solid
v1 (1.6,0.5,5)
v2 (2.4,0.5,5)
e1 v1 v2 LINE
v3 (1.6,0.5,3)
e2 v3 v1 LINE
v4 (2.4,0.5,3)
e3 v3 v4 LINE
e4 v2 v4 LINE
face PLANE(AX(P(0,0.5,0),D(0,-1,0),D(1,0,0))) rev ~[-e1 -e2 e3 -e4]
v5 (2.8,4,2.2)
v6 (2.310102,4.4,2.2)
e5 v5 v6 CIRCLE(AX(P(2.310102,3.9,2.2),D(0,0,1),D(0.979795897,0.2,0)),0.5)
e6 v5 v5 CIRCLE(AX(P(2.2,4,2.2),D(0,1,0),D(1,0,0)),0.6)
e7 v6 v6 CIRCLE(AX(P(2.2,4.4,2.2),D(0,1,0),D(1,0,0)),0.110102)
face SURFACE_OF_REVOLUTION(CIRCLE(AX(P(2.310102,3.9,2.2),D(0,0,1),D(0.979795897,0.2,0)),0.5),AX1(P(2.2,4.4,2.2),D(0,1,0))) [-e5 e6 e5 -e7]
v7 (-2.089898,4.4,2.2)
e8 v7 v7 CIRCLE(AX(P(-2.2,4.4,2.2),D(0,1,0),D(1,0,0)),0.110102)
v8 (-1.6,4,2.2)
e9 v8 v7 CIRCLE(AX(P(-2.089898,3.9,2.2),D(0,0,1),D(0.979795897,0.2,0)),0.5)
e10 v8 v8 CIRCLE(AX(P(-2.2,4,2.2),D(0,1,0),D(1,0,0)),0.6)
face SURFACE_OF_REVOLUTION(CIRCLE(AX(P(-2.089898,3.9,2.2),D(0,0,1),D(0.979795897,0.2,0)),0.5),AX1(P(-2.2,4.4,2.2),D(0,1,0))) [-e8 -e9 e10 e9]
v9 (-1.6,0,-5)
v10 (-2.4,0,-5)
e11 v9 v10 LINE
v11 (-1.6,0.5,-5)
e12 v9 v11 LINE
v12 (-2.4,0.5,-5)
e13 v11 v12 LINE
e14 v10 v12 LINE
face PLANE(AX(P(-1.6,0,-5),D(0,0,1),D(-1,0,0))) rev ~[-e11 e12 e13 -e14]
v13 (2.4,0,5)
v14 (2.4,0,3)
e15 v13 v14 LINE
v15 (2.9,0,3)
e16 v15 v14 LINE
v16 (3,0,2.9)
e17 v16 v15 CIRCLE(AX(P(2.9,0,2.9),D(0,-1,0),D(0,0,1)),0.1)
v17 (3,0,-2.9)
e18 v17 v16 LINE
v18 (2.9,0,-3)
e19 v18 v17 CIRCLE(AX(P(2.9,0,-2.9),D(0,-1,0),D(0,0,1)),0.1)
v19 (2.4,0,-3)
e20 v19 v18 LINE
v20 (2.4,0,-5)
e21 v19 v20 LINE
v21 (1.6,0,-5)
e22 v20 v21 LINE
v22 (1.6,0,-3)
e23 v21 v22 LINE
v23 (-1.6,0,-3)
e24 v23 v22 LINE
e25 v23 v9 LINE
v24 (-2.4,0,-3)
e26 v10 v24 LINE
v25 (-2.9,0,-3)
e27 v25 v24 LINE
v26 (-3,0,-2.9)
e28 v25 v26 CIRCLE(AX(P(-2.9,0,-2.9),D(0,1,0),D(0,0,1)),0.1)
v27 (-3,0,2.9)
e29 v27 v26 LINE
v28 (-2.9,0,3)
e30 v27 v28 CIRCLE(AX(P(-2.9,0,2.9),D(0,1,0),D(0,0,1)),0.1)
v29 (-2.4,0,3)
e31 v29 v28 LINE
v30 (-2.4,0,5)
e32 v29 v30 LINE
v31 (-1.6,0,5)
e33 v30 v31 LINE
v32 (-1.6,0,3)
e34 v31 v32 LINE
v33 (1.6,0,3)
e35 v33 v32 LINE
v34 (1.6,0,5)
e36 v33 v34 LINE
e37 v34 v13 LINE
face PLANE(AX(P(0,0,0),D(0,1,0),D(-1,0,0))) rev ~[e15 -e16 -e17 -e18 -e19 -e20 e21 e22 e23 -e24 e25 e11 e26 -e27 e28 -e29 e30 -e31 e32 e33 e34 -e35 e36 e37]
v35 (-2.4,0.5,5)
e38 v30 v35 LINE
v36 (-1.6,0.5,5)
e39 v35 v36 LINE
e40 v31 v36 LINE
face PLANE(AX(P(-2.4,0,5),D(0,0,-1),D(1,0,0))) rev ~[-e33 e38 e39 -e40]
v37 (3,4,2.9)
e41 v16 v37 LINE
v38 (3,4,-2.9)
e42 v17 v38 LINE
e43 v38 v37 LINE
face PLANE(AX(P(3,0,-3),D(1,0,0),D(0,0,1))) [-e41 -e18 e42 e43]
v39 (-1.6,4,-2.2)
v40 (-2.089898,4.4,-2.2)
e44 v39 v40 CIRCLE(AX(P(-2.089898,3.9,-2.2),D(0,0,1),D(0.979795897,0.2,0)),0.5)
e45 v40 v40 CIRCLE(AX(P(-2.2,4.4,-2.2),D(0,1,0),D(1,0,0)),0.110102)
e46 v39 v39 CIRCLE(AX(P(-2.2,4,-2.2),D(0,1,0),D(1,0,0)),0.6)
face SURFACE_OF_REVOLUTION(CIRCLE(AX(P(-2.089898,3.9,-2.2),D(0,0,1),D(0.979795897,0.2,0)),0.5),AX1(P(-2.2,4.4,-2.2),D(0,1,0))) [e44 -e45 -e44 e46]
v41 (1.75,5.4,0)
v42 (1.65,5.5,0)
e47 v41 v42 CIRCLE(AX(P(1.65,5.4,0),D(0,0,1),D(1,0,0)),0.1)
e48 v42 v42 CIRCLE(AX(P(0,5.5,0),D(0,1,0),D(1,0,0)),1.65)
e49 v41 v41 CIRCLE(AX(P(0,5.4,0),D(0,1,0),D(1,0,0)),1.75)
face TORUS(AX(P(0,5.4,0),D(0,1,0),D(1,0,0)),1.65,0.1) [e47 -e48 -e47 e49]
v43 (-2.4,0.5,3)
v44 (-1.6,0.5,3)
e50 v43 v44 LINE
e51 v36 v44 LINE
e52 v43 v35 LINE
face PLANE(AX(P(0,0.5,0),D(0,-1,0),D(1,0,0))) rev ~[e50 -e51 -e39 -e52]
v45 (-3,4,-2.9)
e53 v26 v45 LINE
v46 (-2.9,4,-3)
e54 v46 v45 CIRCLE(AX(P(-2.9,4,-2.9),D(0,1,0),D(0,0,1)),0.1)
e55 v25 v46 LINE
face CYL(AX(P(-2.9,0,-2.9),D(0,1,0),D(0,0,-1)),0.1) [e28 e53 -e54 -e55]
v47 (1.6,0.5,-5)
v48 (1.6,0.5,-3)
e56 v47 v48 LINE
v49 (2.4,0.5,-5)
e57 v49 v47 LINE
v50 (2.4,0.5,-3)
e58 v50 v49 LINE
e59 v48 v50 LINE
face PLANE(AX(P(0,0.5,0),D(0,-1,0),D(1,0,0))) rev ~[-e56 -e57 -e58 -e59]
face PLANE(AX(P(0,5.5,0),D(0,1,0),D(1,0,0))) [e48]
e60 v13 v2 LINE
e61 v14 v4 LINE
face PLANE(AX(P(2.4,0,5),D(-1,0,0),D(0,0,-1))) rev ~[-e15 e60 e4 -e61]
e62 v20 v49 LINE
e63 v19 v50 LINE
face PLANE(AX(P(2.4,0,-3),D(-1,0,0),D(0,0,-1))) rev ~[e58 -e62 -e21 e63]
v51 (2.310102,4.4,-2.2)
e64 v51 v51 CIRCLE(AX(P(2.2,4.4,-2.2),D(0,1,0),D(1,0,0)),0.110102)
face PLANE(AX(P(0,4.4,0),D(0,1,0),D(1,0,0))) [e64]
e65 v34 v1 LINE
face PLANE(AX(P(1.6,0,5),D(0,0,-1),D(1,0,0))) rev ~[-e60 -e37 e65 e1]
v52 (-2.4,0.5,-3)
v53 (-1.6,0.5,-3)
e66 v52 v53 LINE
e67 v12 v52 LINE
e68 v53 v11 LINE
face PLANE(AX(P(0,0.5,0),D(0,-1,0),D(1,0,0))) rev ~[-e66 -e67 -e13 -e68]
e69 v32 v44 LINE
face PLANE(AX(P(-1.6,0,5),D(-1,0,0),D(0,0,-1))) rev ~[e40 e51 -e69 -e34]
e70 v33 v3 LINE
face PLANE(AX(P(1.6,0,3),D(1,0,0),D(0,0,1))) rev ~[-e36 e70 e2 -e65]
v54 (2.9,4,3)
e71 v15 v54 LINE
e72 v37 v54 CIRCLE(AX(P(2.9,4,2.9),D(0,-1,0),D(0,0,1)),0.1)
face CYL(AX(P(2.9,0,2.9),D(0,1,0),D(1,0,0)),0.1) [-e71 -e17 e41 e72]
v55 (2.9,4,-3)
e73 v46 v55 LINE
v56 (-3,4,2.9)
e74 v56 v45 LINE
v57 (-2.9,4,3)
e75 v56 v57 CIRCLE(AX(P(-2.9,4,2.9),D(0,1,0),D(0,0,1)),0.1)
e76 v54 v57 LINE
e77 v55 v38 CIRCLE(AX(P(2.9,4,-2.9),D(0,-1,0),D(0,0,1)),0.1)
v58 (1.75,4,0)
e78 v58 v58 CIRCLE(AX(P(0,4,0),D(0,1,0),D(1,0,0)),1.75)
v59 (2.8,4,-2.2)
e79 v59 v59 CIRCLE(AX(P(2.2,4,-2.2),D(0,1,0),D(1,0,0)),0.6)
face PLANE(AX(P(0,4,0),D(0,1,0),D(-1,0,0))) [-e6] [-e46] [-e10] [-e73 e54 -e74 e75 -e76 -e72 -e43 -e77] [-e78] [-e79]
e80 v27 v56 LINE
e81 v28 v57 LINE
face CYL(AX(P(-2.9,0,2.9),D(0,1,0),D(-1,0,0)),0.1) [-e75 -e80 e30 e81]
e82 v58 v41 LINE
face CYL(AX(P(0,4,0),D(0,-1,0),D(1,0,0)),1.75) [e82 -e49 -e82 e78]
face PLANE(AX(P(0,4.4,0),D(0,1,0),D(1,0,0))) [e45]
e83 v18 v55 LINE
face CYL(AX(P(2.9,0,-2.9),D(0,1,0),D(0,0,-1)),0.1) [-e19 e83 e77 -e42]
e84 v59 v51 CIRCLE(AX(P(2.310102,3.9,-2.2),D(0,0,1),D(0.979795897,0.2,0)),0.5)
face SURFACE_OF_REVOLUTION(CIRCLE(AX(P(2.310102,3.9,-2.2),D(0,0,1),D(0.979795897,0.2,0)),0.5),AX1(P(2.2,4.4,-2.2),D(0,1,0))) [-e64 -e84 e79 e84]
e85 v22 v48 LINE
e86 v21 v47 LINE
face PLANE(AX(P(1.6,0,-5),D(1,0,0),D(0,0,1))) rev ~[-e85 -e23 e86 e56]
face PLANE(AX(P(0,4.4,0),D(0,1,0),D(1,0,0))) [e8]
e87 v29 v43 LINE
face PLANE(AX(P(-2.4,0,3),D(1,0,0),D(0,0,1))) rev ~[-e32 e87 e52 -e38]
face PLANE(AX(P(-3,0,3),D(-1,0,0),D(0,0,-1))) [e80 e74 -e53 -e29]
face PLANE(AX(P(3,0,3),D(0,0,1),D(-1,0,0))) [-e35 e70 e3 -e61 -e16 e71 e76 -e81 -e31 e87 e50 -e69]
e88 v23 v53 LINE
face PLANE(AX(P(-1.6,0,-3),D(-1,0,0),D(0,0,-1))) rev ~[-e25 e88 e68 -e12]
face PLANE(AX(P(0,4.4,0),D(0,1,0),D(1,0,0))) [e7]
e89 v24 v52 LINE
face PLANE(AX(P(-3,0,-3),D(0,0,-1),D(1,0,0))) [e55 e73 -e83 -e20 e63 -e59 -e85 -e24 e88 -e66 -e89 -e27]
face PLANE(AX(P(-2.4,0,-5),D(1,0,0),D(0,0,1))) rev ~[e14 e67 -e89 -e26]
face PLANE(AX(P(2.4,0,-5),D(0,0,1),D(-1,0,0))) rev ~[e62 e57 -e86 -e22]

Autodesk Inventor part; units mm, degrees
ref_plane "YZ Plane" through (0, 0, 0) normal (1, 0, 0) x (0, 1, 0)
ref_plane "XZ Plane" through (0, 0, 0) normal (0, 1, 0) x (-1, 0, 0)
ref_plane "XY Plane" through (0, 0, 0) normal (0, 0, 1) x (1, 0, 0)
sketch "Esquisse1" plane through (0, 0, 0) normal (0, 1, 0) x (-1, 0, 0)
  line L0 (3, -3) -> (-3, -3)
  line L1 (-3, -3) -> (-3, 3)
  line L2 (-3, 3) -> (3, 3)
  line L3 (3, 3) -> (3, -3)
  point P0 (0, 0)
  dimension "d0" = 3
  dimension "d1" = 6
  dimension "d2" = 6
  dimension "d3" = 3
extrude "Extrusion1" add sketch "Esquisse1" along normal blind 4
sketch "Esquisse2" plane through (0, 4, 0) normal (0, 1, 0) x (1, 0, 0)
  circle A0 centre (0, 0) radius 1.75
  dimension "d6" = 3.5
extrude "Extrusion2" add sketch "Esquisse2" along normal blind 1.5
sketch "Esquisse3" plane through (0, 4, 0) normal (0, 1, 0) x (1, 0, 0)
  circle A0 centre (-2.2, -2.2) radius 0.6
  line L0 (-3, -3) -> (3, -3) projected
  line L1 (-3, 3) -> (-3, -3) projected
  circle A1 centre (2.2, -2.2) radius 0.6
  circle A2 centre (-2.2, 2.2) radius 0.6
  circle A3 centre (2.2, 2.2) radius 0.6
  point P0 (0, 0)
  dimension "d9" = 0.8
  dimension "d10" = 0.8
  dimension "d11" = 1.2
  dimension "d14" = 4.4
  dimension "d17" = 4.4
extrude "Extrusion3" add sketch "Esquisse3" along normal blind 0.4
sketch "Esquisse4" plane through (0, 0, 0) normal (0, -1, 0) x (1, 0, 0)
  line L0 (-3, 3) -> (3, 3) projected
  line L1 (2.4, 3) -> (1.6, 3)
  line L2 (1.6, 3) -> (1.6, 5)
  line L3 (1.6, 5) -> (2.4, 5)
  line L4 (2.4, 5) -> (2.4, 3)
  line L5 (3, -3) -> (3, 3) projected
  line L6 (2.4, -5) -> (1.6, -5)
  line L7 (1.6, -5) -> (1.6, -3)
  line L8 (1.6, -3) -> (2.4, -3)
  line L9 (2.4, -3) -> (2.4, -5)
  line L10 (-1.6, 3) -> (-2.4, 3)
  line L11 (-2.4, 3) -> (-2.4, 5)
  line L12 (-2.4, 5) -> (-1.6, 5)
  line L13 (-1.6, 5) -> (-1.6, 3)
  line L14 (-1.6, -5) -> (-2.4, -5)
  line L15 (-2.4, -5) -> (-2.4, -3)
  line L16 (-2.4, -3) -> (-1.6, -3)
  line L17 (-1.6, -3) -> (-1.6, -5)
  point P0 (0, 0)
  dimension "d22" = 2
  dimension "d23" = 0.8
  dimension "d24" = 0.6
  dimension "d27" = 8
  dimension "d30" = 4
extrude "Extrusion4" add sketch "Esquisse4" against normal blind 0.5
fillet "Congé1" radius 0.5 4 edges at (1.6, 4.4, 2.2) (-2.8, 4.4, 2.2) (-2.8, 4.4, -2.2) (1.6, 4.4, -2.2)
fillet "Congé2" radius 0.1 1 edges at (-1.75, 5.5, 0)
fillet "Congé3" radius 0.1 4 edges at (3, 2, 3) (3, 2, -3) (-3, 2, -3) (-3, 2, 3)
equation "\"d0\" = 0.5 * d1"
equation "\"d3\" = 0.5 * d2"
equation "\"d10\" = d9"
properties part number "Touch Button"
